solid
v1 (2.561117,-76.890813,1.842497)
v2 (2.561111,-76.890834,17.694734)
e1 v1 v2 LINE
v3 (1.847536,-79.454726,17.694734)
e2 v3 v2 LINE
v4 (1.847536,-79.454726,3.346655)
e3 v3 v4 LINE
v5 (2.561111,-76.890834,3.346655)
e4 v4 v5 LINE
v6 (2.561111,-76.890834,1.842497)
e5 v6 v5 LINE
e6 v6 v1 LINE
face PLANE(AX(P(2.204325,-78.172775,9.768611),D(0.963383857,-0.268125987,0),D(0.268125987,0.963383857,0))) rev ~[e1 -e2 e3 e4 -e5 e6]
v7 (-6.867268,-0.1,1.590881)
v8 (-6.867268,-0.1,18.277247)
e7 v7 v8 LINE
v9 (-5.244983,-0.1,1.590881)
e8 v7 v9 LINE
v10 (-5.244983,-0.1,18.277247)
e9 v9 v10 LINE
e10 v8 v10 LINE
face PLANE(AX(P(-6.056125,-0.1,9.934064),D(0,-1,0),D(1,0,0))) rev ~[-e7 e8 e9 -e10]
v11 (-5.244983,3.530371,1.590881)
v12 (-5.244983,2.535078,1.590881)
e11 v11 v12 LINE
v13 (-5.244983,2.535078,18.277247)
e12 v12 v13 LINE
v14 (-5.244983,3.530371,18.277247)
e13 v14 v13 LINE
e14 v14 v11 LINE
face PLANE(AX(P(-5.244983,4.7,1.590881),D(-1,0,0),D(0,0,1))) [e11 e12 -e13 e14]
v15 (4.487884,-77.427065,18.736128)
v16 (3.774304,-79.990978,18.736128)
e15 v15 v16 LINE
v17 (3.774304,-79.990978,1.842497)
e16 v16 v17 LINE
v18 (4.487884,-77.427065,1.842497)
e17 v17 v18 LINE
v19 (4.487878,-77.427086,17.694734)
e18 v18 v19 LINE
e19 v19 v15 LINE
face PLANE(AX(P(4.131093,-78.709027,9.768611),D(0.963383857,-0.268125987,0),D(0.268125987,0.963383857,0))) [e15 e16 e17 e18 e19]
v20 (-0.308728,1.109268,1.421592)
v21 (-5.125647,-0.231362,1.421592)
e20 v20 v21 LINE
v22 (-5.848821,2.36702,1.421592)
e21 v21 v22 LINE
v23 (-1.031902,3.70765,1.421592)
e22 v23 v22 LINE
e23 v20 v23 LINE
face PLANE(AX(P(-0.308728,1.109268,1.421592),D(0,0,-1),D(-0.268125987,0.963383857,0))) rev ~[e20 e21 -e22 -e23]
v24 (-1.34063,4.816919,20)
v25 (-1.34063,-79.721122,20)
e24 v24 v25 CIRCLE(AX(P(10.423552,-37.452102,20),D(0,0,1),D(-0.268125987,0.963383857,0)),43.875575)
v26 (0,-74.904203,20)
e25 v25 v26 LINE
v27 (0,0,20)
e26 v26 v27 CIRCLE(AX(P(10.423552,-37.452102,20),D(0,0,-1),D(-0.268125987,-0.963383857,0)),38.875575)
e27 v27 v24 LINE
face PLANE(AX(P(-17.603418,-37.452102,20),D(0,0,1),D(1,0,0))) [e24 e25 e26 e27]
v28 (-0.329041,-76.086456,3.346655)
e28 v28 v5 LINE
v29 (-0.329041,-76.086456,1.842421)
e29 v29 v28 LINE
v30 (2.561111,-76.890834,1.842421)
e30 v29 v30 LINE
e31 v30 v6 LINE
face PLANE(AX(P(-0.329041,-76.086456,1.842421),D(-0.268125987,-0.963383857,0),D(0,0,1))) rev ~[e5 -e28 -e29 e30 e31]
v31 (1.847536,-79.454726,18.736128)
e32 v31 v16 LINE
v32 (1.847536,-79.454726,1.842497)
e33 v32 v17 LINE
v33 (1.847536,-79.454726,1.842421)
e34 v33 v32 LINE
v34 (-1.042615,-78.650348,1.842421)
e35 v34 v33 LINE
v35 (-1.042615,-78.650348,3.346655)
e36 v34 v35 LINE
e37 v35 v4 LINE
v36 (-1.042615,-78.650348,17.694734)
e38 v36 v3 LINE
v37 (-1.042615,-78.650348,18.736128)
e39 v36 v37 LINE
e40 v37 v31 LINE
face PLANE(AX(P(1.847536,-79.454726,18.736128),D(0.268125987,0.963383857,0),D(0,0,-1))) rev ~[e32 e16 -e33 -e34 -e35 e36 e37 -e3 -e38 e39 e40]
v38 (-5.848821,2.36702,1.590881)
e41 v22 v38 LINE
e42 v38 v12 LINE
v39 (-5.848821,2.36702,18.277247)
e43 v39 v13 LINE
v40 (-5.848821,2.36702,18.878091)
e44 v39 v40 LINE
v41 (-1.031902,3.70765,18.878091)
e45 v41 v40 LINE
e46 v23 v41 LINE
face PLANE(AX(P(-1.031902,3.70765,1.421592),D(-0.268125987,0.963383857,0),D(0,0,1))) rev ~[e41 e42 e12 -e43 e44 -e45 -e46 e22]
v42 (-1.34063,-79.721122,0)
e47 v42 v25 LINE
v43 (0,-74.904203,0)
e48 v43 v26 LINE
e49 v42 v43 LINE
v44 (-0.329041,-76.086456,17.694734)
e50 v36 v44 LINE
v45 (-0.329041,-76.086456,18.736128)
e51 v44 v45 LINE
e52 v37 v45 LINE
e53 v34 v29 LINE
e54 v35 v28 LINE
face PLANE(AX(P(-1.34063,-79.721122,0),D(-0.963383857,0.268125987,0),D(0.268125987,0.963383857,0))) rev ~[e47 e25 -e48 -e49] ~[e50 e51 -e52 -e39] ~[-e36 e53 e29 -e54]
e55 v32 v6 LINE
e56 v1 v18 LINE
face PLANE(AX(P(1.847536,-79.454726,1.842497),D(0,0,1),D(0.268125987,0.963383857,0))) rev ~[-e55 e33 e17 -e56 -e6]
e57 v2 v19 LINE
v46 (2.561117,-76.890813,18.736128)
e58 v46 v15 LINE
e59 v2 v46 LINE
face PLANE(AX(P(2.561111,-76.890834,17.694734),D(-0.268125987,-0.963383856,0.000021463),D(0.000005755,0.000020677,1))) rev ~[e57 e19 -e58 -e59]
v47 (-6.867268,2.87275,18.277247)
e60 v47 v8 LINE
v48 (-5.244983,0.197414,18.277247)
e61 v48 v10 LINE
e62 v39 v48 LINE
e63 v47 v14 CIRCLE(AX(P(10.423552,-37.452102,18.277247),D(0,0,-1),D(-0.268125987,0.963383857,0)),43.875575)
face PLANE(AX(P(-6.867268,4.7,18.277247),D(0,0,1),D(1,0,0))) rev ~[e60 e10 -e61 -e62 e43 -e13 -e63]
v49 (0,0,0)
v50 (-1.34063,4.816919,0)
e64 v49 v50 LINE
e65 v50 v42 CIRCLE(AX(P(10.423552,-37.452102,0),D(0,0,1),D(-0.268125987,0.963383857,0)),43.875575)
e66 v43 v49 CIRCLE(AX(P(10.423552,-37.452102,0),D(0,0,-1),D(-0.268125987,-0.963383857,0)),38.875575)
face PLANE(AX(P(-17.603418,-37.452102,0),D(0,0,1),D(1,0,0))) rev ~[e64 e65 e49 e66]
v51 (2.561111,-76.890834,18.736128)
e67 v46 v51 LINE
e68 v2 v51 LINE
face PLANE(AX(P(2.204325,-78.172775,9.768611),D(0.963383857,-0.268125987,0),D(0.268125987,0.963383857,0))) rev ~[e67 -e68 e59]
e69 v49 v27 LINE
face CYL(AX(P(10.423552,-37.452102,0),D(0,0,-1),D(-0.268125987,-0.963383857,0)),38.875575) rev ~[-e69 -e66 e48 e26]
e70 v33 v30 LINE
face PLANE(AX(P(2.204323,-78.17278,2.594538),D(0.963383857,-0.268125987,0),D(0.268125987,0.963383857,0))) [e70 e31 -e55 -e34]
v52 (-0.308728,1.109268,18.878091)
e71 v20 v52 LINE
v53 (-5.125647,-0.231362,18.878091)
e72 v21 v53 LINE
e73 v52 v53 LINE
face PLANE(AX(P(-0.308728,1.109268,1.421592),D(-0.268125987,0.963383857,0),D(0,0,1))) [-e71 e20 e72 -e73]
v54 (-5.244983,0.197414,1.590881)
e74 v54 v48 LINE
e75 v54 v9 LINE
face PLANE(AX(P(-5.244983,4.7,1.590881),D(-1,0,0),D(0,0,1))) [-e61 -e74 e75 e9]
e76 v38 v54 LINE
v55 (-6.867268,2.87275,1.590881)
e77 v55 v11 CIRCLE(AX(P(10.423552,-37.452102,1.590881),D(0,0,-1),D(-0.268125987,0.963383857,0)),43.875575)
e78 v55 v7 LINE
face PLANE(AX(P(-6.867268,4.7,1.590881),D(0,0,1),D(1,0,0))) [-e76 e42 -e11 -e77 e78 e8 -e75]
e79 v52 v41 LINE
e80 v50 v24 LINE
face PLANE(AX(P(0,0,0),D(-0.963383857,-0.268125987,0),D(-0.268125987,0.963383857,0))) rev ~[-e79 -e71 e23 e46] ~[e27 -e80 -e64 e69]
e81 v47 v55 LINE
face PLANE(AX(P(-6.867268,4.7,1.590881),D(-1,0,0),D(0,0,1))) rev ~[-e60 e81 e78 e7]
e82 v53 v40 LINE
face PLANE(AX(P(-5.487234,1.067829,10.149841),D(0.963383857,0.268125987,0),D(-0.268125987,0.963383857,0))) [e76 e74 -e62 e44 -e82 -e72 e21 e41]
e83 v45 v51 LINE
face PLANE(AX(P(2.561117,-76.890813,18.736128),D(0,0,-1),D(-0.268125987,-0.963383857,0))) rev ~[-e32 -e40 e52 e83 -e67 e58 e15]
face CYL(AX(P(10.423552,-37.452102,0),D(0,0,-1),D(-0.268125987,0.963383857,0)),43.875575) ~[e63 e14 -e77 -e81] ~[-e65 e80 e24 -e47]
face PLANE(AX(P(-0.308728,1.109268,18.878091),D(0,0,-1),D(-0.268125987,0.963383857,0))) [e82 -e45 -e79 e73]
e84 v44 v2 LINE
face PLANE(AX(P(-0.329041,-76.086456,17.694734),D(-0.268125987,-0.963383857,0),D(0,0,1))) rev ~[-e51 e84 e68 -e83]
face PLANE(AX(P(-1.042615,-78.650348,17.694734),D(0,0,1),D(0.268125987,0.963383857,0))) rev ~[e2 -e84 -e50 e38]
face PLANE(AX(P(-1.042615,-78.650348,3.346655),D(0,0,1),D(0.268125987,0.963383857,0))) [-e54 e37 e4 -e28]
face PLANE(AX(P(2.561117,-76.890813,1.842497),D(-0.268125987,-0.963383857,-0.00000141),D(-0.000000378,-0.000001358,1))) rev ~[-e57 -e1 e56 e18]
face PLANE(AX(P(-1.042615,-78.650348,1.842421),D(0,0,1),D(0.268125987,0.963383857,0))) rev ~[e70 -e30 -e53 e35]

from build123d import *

# Parameters (mm, degrees)
F1_DEPTH  = 20
F2_W      = 2.6613399386
F2_H      = 1.0413937271
F2_H_2    = 1.5042340383
F3_DEPTH  = 3
F5_DEPTH  = 2
F6_W      = 2.6971405605
F6_H      = 17.4564992776
F7_DEPTH  = 5
F9_W      = 1.6222847626
F9_H      = 16.6863657068
F10_DEPTH = 4.8


# Not quite as in the source:
# - ends of sketch curves that miss each other by under 0.0002 mm in the source are joined


with BuildPart() as f1:
    # F0 (on Top) → F1 (new body)
    with BuildSketch(Plane.XY):
        with BuildLine():
            ThreePointArc((0, -74.9042034149), (-28.4520233491, -37.4521017075), (0, 0))
            Line((0, 0), (-1.3406298741, 4.8169190701))
            ThreePointArc((-1.3406298741, 4.8169190701), (-33.4520231279, -37.4521017075), (-1.3406298741, -79.7211224851))
            Line((-1.3406298741, -79.7211224851), (0, -74.9042034149))
        make_face()
    extrude(amount=F1_DEPTH)

    # F2 (on face) → F3 (join)
    with BuildSketch(Plane(origin=(19.3483734862, -5.3849788907, 0), x_dir=(0.2681259867, 0.9633838567, 0), z_dir=(0.9633838567, -0.2681259867, 0))):
        with Locations((-74.7193582356, 18.2154309005)):
            Rectangle(F2_W, F2_H)
        with Locations((-74.7193582356, 2.5945375673)):
            Rectangle(F2_W, F2_H_2)
    extrude(amount=F3_DEPTH)

    # F4 (on face) → F5 (join)
    with BuildSketch(Plane(origin=(22.2385250561, -6.1893568507, 0), x_dir=(0.2681259867, 0.9633838567, 0), z_dir=(0.9633838567, -0.2681259867, 0))):
        Polygon((-73.3886882663, 17.6947340369), (-76.0500282049, 17.6947340369), (-76.0500282049, 1.8424974987), (-73.3886659145, 1.8424974987), align=None)
        Polygon((-73.3886659145, 18.736127764), (-76.0500282049, 18.736127764), (-76.0500282049, 17.6947340369), (-73.3886882663, 17.6947340369), align=None)
    extrude(amount=F5_DEPTH)

    # F6 (on face) → F7 (cut)
    with BuildSketch(Plane(origin=(0, 0, 0), x_dir=(-0.2681259867, 0.9633838567, 0), z_dir=(0.9633838567, 0.2681259867, 0))):
        with Locations((2.4999994203, 10.1498414879)):
            Rectangle(F6_W, F6_H)
    extrude(amount=-F7_DEPTH, mode=Mode.SUBTRACT)

    # F9 (on offset) → F10 (cut)
    with BuildSketch(Plane.XZ.offset(-4.7)):
        with Locations((-6.0561252758, 9.9340636516)):
            Rectangle(F9_W, F9_H)
    extrude(amount=F10_DEPTH, mode=Mode.SUBTRACT)


solid = f1.part
